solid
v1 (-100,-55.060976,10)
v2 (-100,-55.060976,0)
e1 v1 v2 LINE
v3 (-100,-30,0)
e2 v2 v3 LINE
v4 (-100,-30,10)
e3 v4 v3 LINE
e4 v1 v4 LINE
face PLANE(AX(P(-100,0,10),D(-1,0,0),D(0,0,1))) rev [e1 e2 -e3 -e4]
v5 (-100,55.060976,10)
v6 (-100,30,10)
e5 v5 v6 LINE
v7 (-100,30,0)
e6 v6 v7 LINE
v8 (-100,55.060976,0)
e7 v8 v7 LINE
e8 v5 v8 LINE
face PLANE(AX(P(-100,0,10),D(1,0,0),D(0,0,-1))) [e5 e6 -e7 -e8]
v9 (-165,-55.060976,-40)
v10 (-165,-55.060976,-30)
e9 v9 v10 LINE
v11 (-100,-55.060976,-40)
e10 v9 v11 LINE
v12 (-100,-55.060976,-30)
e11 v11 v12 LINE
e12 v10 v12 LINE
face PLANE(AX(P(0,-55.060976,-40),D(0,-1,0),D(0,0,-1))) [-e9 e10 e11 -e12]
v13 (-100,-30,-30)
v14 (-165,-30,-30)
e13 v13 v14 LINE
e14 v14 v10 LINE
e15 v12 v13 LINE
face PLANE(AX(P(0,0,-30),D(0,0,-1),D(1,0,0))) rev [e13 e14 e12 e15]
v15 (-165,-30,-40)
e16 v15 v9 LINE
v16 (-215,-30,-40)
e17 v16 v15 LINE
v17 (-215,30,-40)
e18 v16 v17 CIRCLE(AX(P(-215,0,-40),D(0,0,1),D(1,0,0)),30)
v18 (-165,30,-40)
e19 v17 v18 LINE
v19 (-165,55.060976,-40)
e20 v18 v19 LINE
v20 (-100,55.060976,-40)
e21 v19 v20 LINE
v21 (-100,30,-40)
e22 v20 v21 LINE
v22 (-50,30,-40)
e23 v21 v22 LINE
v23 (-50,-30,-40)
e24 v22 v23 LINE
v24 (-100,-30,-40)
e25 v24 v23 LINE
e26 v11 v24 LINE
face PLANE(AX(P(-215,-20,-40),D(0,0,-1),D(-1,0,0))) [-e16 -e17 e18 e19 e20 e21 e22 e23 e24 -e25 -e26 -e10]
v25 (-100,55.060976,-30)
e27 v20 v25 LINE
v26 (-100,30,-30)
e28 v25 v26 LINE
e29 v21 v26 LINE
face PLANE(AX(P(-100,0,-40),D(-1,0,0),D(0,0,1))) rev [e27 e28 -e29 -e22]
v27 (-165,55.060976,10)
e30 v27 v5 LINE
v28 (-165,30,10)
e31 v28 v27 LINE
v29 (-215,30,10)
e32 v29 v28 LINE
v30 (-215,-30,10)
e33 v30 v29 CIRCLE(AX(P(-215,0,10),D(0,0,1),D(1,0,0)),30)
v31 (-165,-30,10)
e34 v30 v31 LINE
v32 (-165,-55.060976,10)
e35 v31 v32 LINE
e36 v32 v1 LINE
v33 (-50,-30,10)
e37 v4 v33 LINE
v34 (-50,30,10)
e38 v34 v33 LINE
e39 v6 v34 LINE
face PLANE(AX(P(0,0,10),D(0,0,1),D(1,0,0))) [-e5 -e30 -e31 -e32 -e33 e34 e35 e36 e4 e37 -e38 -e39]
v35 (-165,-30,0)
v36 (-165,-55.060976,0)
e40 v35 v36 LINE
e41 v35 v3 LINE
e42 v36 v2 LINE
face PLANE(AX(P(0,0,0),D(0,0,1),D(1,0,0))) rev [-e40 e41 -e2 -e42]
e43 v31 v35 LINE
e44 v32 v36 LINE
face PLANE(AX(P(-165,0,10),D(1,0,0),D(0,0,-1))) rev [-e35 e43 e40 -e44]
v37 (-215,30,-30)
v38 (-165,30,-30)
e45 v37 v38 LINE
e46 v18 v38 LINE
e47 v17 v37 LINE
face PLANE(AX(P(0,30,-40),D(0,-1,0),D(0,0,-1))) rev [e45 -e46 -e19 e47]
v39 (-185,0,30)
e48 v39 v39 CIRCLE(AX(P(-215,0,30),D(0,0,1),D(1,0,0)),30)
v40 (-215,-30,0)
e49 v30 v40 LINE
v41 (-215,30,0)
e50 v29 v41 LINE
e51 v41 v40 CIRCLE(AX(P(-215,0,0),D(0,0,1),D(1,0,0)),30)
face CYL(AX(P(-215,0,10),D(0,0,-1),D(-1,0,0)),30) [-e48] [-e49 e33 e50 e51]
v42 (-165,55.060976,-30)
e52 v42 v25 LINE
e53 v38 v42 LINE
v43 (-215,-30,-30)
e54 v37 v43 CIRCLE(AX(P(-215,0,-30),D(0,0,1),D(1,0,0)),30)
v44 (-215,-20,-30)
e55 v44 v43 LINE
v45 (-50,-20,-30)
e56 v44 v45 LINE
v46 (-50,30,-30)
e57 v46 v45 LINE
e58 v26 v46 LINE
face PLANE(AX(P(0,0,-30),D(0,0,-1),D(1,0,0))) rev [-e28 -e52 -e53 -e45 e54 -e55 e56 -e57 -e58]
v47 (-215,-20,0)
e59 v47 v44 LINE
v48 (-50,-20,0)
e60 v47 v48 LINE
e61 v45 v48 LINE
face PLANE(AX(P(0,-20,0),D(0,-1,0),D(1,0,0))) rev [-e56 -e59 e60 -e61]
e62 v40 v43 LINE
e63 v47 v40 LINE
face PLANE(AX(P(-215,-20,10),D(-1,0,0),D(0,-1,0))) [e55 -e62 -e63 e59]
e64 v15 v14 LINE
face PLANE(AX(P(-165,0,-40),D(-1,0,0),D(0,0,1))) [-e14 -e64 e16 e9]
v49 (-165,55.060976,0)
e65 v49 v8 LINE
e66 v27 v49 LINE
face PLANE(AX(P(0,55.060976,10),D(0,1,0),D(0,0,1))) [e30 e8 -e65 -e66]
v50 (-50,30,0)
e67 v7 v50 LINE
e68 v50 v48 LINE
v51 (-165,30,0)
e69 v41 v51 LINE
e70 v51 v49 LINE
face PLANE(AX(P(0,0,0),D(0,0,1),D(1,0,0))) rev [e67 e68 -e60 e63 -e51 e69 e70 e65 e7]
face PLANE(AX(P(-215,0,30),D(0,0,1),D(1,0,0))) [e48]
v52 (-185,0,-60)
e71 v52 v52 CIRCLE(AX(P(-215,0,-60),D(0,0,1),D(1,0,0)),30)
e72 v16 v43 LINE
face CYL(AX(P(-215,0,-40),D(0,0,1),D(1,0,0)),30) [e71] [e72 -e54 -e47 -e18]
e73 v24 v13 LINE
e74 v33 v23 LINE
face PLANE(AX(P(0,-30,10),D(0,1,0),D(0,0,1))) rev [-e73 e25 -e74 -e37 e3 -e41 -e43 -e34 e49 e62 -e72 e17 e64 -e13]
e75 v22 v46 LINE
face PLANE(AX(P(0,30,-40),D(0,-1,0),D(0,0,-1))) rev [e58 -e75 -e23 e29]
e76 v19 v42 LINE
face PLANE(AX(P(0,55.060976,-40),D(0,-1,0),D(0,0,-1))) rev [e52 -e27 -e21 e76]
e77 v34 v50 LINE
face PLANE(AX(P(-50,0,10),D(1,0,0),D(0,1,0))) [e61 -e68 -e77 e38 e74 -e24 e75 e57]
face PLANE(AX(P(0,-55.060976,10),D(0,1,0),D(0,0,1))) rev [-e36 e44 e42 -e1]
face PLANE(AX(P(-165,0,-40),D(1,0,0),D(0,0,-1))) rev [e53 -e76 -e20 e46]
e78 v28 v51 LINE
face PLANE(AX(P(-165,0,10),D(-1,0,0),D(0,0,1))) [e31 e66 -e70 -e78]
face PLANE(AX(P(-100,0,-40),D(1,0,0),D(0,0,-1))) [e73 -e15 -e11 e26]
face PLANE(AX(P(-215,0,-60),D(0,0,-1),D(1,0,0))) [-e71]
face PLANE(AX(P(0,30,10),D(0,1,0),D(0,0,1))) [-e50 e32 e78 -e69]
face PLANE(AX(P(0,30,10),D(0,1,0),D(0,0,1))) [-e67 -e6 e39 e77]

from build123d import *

# Parameters (mm, degrees)
BOSS_EXTRUDE1_DEPTH = 10
SKETCH2_R           = 30
BOSS_EXTRUDE2_DEPTH = 20
SKETCH3_W           = 165
SKETCH3_H           = 50
BOSS_EXTRUDE3_DEPTH = 10


with BuildPart() as part:
    # Sketch1 → Boss-Extrude1 (new body)
    with BuildSketch(Plane.XY):
        with BuildLine():
            Line((-165, 30), (-215, 30))
            ThreePointArc((-215, 30), (-245, 0), (-215, -30))
            Line((-215, -30), (-165, -30))
            Line((-165, -30), (-165, -55.06097561))
            Line((-165, -55.06097561), (-100, -55.06097561))
            Line((-100, -55.06097561), (-100, -30))
            Line((-100, -30), (-50, -30))
            Line((-50, -30), (-50, 30))
            Line((-50, 30), (-100, 30))
            Line((-100, 30), (-100, 55.06097561))
            Line((-100, 55.06097561), (-165, 55.06097561))
            Line((-165, 55.06097561), (-165, 30))
        make_face()
    boss_extrude1 = extrude(amount=BOSS_EXTRUDE1_DEPTH)

    # Sketch2 → Boss-Extrude2 (add)
    with BuildSketch(Plane.XY.offset(10)):
        with Locations((-215, 0)):
            Circle(SKETCH2_R)
    boss_extrude2 = extrude(amount=BOSS_EXTRUDE2_DEPTH)

    # Sketch3 → Boss-Extrude3 (add)
    with BuildSketch(Plane.XZ.offset(30)):
        with Locations((-132.5, -15)):
            Rectangle(SKETCH3_W, SKETCH3_H)
    extrude(amount=-BOSS_EXTRUDE3_DEPTH)

    # Mirror1: Boss-Extrude1, Boss-Extrude2 across plane
    add(boss_extrude1.mirror(Plane.XY.offset(-15)))
    add(boss_extrude2.mirror(Plane.XY.offset(-15)))


solid = part.part
